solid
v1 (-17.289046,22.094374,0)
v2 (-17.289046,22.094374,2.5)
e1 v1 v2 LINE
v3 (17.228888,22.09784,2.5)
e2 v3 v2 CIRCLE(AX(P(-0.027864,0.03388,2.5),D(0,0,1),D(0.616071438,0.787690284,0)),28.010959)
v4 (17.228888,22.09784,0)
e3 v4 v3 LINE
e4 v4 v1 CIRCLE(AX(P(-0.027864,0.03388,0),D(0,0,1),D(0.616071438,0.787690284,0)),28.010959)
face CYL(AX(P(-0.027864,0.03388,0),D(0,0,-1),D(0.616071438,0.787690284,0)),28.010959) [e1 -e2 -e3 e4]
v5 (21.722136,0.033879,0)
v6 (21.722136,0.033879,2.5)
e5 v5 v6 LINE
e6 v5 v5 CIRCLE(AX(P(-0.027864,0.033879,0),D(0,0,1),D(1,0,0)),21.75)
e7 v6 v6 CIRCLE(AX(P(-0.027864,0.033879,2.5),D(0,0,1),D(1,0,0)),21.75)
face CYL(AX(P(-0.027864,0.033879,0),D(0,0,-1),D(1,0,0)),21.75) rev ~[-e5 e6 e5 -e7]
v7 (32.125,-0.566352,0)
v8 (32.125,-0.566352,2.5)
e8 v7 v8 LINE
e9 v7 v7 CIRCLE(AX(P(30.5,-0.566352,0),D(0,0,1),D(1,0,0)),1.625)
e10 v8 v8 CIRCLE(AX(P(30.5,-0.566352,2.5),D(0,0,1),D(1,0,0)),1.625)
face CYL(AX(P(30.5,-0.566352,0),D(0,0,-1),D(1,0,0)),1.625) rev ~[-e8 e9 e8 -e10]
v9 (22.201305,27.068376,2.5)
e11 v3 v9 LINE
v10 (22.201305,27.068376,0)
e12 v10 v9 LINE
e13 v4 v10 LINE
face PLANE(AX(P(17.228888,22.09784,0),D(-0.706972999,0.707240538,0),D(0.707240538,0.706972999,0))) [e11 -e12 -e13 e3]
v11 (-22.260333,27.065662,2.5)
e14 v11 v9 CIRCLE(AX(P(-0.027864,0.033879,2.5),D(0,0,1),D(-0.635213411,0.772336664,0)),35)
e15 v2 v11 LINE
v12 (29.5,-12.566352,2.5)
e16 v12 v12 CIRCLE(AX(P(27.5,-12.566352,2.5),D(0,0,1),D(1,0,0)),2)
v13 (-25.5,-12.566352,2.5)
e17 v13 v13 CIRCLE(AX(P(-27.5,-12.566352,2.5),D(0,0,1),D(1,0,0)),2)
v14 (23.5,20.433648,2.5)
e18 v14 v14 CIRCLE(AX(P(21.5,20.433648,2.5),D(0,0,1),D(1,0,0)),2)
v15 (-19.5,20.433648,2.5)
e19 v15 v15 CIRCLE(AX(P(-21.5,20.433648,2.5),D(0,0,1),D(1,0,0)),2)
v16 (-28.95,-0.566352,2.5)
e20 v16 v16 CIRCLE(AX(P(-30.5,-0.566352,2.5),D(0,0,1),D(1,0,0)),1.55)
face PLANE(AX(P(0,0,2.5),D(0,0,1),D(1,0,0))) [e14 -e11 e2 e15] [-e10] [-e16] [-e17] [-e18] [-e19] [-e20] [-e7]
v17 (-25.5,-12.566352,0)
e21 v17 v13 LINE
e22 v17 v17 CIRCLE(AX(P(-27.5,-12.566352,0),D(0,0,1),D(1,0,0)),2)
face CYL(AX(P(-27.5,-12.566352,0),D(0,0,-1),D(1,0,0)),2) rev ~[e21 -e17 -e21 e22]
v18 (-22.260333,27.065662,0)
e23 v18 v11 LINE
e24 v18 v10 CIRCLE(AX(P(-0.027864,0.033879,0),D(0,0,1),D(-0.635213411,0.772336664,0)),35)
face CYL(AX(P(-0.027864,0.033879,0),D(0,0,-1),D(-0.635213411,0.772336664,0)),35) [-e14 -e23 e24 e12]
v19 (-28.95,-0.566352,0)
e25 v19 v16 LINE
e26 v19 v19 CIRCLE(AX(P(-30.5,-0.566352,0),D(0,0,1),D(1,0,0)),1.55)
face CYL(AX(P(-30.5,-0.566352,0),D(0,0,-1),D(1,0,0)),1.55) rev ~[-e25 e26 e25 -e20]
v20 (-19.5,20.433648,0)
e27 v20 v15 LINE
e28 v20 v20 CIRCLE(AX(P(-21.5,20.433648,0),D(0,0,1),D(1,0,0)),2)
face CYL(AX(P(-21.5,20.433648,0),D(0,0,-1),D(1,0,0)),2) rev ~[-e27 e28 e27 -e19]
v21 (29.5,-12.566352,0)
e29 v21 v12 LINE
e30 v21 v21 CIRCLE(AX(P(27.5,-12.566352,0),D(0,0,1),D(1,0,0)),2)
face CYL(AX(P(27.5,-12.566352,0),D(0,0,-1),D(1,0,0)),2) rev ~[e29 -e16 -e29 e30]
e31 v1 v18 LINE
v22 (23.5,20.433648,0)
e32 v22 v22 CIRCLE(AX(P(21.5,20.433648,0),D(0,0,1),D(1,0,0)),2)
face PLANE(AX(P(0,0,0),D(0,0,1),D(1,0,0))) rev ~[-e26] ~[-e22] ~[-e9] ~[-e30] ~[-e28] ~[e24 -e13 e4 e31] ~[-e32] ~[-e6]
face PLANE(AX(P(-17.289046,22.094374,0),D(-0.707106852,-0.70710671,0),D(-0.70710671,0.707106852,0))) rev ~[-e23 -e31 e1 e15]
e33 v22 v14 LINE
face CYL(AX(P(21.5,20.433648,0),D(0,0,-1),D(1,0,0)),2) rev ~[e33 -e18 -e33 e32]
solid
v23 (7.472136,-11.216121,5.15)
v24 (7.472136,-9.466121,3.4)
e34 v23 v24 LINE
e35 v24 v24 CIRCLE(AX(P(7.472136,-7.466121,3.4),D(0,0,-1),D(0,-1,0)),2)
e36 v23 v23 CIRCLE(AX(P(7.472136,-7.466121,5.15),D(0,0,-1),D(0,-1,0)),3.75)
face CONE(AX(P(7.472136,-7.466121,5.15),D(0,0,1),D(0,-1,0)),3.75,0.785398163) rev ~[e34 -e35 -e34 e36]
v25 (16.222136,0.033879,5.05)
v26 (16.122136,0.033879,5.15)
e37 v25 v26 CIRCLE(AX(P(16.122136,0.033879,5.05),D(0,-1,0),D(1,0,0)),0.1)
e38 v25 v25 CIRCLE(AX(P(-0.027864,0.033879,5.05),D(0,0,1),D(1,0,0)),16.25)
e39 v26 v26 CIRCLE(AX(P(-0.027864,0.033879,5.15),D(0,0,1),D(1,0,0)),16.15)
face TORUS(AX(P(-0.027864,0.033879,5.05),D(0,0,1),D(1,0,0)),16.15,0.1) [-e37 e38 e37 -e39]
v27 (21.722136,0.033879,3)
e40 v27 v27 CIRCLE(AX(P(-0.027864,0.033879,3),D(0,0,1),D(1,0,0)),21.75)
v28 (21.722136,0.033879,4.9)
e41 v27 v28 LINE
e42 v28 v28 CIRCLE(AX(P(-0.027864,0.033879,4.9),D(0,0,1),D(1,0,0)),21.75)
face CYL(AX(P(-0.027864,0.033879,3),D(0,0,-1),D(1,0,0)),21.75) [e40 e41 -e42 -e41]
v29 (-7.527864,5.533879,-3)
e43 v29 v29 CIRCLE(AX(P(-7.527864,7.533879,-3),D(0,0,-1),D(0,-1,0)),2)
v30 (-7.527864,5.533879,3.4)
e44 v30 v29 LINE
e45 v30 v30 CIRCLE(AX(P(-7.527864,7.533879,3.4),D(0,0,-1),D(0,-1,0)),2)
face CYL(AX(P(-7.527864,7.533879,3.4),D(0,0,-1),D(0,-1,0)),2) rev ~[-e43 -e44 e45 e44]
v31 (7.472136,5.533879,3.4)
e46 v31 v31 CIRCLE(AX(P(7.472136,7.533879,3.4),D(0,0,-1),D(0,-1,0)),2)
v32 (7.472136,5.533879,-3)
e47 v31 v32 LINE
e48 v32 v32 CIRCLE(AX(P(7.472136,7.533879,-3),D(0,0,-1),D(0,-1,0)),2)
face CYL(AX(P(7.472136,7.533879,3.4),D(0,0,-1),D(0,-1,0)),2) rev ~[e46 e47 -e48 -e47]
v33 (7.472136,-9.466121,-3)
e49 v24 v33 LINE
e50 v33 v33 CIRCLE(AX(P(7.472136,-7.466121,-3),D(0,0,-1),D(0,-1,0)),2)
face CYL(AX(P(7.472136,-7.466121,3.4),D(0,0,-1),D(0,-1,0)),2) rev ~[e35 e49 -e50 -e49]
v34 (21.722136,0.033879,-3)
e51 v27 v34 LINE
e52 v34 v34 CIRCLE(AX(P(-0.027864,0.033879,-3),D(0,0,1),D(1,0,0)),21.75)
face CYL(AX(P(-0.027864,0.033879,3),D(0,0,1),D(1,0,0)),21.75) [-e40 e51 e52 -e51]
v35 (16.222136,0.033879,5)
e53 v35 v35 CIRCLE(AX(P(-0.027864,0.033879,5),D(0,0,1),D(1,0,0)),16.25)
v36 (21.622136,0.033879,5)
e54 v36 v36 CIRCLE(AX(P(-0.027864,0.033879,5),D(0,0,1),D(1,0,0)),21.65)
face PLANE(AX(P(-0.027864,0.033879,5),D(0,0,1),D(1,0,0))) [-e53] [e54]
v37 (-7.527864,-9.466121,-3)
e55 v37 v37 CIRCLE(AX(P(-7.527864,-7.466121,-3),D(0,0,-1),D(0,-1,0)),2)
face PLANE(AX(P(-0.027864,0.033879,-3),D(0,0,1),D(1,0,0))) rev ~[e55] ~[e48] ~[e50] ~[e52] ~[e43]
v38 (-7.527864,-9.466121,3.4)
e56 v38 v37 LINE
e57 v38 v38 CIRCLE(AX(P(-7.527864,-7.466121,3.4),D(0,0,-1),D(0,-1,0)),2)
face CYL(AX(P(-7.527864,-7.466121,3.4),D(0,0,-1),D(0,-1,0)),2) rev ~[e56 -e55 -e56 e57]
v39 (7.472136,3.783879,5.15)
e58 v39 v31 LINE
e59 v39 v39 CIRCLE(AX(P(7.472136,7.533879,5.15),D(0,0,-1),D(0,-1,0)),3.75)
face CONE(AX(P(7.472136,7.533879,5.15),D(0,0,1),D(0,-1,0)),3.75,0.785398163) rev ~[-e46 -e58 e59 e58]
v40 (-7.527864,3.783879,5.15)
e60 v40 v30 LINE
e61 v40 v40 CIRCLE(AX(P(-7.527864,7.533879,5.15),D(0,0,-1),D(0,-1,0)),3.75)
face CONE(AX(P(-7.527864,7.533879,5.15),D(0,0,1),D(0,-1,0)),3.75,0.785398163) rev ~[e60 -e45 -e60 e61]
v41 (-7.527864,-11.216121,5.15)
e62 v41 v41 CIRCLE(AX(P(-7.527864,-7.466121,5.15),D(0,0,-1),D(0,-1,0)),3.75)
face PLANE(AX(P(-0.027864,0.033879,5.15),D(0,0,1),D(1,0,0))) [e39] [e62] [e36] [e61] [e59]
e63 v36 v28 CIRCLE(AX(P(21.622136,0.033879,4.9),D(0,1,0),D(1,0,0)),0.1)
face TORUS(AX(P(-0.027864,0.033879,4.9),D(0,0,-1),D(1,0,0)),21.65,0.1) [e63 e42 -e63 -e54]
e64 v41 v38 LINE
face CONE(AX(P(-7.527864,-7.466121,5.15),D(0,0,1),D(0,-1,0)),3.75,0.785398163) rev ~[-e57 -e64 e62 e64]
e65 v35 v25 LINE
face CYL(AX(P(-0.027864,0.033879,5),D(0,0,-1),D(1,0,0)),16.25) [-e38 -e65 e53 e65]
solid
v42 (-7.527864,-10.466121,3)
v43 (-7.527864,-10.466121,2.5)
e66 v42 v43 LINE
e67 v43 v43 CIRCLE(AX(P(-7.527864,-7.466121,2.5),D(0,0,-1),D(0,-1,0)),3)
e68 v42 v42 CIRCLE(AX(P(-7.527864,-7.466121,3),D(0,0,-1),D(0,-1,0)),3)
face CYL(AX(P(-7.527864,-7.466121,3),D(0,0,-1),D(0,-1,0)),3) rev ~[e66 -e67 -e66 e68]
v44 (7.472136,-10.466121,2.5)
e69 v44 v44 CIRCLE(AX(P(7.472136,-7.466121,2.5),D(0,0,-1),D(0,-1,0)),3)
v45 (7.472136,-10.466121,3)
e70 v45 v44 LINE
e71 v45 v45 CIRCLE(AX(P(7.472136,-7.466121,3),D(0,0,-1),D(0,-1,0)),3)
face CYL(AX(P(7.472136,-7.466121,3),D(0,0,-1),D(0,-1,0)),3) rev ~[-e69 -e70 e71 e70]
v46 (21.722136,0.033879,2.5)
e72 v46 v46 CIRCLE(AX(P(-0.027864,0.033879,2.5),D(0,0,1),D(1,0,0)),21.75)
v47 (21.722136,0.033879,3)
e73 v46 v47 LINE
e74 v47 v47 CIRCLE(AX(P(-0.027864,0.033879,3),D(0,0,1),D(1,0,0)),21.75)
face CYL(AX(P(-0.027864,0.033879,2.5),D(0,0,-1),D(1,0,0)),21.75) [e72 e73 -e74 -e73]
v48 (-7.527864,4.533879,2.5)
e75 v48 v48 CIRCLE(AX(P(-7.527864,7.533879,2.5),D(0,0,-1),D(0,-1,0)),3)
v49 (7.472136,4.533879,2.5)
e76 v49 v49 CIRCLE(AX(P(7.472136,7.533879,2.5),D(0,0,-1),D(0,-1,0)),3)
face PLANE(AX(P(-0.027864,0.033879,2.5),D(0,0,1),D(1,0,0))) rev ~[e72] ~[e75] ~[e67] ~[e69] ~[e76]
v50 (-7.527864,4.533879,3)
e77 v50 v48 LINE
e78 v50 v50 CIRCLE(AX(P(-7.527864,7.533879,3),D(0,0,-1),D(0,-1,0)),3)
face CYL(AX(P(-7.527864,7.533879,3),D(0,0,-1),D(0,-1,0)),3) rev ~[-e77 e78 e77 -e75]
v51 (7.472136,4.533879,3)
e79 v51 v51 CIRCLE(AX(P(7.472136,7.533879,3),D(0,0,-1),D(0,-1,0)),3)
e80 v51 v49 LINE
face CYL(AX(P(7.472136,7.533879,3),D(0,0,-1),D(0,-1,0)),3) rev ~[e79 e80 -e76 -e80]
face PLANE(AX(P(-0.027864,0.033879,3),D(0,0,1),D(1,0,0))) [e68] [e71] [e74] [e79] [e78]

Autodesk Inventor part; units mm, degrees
ref_plane "YZ Plane" through (0, 0, 0) normal (1, 0, 0) x (0, 1, 0)
ref_plane "XZ Plane" through (0, 0, 0) normal (0, 1, 0) x (-1, 0, 0)
ref_plane "XY Plane" through (0, 0, 0) normal (0, 0, 1) x (1, 0, 0)
sketch "Szkic1" plane through (0, 0, 0) normal (0, 0, 1) x (1, 0, 0)
  circle A0 centre (21.5, 20.433648) radius 2
  circle A1 centre (27.5, -12.566352) radius 2
  circle A2 centre (-27.5, -12.566352) radius 2
  circle A3 centre (-21.5, 20.433648) radius 2
  arc A4 (-22.260333, 27.065662) -> (22.201305, 27.068376) centre (-0.027864, 0.033879) ccw
  circle A5 centre (30.5, -0.566352) radius 1.55
  circle A6 centre (-30.5, -0.566352) radius 1.55
  circle A7 centre (30.5, -0.566352) radius 1.625
  circle A8 centre (-0.027864, 0.033879) radius 21.75
  line L0 (-17.289046, 22.094374) -> (-22.260333, 27.065662)
  arc A9 (17.228888, 22.09784) -> (-17.289046, 22.094374) centre (-0.027864, 0.033879) ccw
  line L1 (17.228888, 22.09784) -> (22.201305, 27.068376)
  point P0 (0, 0)
  dimension "d1" = 70
  dimension "d4" = 3.25
  dimension "d5" = 43.5
extrude "Wyciągnięcie proste2" add sketch "Szkic1" along normal blind 2.5 contours L0 A9 L1 A4
sketch "Szkic2" plane through (-0.027864, 0.033879, 2.5) normal (0, 0, 1) x (1, 0.000061, 0)
  circle A0 centre (0, 0) radius 21.75 projected
  circle A1 centre (0, 0) radius 35 projected
  circle A2 centre (0, 0) radius 21.75
extrude "Wyciągnięcie proste3" add sketch "Szkic2" along normal blind 0.5 separate body contours A0
sketch "Szkic3" plane through (-0.027864, 0.033879, 3) normal (0, 0, 1) x (1, 0, 0)
  circle A0 centre (0, 0) radius 21.75 projected
  circle A1 centre (0, 0) radius 21.9
  dimension "d10" = 43.8
sketch "Szkic3 outline for Wyciągnięcie proste4" plane through (-0.027864, 0.033879, 3) normal (0, 0, 1) x (1, 0, 0)
  circle A0 centre (0, 0) radius 21.75
extrude "Wyciągnięcie proste4" add sketch "Szkic3 outline for Wyciągnięcie proste4" along normal blind 2 and the other way blind 6 separate body
sketch "Szkic4" plane through (-0.027864, 0.033879, 5) normal (0, 0, 1) x (1, 0, 0)
  circle A0 centre (0, 0) radius 21.75 projected
  circle A1 centre (0, 0) radius 16.25
  dimension "d13" = 32.5
extrude "Wyciągnięcie proste5" add sketch "Szkic4" along normal blind 0.15 contours A1 bodies 3
fillet "Zaokrąglenie1" radius 0.1 1 edges at (-16.2779, 0.0339, 5.15)
fillet "Zaokrąglenie2" radius 0.1 1 edges at (-21.7779, 0.0339, 5)
sketch "Szkic5" plane through (-0.027864, 0.033879, 5.15) normal (0, 0, 1) x (1, 0, 0)
  circle A0 centre (7.5, 7.5) radius 3.75
  circle A1 centre (7.5, -7.5) radius 3.75
  circle A2 centre (-7.5, -7.5) radius 3.75
  circle A3 centre (-7.5, 7.5) radius 3.75
hole "Otwór1" at (7.472136, 7.533879, 5.15) at (7.472136, -7.466121, 5.15) at (-7.527864, -7.466121, 5.15) at (-7.527864, 7.533879, 5.15) direction (0, 0, -1) diameter 4 end through all countersink diameter 7.5 countersink angle 90 bodies 3
thread "Gwint1" size "M4x0.7" class "6H" standard "ANSI Metric M Profile" full length
thread "Gwint2" size "M4x0.7" class "6H" standard "ANSI Metric M Profile" full length
thread "Gwint3" size "M4x0.7" class "6H" standard "ANSI Metric M Profile" full length
thread "Gwint4" size "M4x0.7" class "6H" standard "ANSI Metric M Profile" full length
sketch "Szkic6" plane through (-0.027864, 0.033879, 3) normal (0, 0, 1) x (1, 0, 0)
  point P0 (0.027864, -0.033879)
  point P1 (-7.5, 7.5)
  point P2 (-7.5, -7.5)
  point P3 (7.5, -7.5)
  point P4 (7.5, 7.5)
hole "Otwór2" at (-7.527864, 7.533879, 3) at (-7.527864, -7.466121, 3) at (7.472136, -7.466121, 3) at (7.472136, 7.533879, 3) direction (0, 0, -1) diameter 6 end through all bodies 2
properties part number "OBROTNICA" material "Stal nierdzewna, austenityczna"
